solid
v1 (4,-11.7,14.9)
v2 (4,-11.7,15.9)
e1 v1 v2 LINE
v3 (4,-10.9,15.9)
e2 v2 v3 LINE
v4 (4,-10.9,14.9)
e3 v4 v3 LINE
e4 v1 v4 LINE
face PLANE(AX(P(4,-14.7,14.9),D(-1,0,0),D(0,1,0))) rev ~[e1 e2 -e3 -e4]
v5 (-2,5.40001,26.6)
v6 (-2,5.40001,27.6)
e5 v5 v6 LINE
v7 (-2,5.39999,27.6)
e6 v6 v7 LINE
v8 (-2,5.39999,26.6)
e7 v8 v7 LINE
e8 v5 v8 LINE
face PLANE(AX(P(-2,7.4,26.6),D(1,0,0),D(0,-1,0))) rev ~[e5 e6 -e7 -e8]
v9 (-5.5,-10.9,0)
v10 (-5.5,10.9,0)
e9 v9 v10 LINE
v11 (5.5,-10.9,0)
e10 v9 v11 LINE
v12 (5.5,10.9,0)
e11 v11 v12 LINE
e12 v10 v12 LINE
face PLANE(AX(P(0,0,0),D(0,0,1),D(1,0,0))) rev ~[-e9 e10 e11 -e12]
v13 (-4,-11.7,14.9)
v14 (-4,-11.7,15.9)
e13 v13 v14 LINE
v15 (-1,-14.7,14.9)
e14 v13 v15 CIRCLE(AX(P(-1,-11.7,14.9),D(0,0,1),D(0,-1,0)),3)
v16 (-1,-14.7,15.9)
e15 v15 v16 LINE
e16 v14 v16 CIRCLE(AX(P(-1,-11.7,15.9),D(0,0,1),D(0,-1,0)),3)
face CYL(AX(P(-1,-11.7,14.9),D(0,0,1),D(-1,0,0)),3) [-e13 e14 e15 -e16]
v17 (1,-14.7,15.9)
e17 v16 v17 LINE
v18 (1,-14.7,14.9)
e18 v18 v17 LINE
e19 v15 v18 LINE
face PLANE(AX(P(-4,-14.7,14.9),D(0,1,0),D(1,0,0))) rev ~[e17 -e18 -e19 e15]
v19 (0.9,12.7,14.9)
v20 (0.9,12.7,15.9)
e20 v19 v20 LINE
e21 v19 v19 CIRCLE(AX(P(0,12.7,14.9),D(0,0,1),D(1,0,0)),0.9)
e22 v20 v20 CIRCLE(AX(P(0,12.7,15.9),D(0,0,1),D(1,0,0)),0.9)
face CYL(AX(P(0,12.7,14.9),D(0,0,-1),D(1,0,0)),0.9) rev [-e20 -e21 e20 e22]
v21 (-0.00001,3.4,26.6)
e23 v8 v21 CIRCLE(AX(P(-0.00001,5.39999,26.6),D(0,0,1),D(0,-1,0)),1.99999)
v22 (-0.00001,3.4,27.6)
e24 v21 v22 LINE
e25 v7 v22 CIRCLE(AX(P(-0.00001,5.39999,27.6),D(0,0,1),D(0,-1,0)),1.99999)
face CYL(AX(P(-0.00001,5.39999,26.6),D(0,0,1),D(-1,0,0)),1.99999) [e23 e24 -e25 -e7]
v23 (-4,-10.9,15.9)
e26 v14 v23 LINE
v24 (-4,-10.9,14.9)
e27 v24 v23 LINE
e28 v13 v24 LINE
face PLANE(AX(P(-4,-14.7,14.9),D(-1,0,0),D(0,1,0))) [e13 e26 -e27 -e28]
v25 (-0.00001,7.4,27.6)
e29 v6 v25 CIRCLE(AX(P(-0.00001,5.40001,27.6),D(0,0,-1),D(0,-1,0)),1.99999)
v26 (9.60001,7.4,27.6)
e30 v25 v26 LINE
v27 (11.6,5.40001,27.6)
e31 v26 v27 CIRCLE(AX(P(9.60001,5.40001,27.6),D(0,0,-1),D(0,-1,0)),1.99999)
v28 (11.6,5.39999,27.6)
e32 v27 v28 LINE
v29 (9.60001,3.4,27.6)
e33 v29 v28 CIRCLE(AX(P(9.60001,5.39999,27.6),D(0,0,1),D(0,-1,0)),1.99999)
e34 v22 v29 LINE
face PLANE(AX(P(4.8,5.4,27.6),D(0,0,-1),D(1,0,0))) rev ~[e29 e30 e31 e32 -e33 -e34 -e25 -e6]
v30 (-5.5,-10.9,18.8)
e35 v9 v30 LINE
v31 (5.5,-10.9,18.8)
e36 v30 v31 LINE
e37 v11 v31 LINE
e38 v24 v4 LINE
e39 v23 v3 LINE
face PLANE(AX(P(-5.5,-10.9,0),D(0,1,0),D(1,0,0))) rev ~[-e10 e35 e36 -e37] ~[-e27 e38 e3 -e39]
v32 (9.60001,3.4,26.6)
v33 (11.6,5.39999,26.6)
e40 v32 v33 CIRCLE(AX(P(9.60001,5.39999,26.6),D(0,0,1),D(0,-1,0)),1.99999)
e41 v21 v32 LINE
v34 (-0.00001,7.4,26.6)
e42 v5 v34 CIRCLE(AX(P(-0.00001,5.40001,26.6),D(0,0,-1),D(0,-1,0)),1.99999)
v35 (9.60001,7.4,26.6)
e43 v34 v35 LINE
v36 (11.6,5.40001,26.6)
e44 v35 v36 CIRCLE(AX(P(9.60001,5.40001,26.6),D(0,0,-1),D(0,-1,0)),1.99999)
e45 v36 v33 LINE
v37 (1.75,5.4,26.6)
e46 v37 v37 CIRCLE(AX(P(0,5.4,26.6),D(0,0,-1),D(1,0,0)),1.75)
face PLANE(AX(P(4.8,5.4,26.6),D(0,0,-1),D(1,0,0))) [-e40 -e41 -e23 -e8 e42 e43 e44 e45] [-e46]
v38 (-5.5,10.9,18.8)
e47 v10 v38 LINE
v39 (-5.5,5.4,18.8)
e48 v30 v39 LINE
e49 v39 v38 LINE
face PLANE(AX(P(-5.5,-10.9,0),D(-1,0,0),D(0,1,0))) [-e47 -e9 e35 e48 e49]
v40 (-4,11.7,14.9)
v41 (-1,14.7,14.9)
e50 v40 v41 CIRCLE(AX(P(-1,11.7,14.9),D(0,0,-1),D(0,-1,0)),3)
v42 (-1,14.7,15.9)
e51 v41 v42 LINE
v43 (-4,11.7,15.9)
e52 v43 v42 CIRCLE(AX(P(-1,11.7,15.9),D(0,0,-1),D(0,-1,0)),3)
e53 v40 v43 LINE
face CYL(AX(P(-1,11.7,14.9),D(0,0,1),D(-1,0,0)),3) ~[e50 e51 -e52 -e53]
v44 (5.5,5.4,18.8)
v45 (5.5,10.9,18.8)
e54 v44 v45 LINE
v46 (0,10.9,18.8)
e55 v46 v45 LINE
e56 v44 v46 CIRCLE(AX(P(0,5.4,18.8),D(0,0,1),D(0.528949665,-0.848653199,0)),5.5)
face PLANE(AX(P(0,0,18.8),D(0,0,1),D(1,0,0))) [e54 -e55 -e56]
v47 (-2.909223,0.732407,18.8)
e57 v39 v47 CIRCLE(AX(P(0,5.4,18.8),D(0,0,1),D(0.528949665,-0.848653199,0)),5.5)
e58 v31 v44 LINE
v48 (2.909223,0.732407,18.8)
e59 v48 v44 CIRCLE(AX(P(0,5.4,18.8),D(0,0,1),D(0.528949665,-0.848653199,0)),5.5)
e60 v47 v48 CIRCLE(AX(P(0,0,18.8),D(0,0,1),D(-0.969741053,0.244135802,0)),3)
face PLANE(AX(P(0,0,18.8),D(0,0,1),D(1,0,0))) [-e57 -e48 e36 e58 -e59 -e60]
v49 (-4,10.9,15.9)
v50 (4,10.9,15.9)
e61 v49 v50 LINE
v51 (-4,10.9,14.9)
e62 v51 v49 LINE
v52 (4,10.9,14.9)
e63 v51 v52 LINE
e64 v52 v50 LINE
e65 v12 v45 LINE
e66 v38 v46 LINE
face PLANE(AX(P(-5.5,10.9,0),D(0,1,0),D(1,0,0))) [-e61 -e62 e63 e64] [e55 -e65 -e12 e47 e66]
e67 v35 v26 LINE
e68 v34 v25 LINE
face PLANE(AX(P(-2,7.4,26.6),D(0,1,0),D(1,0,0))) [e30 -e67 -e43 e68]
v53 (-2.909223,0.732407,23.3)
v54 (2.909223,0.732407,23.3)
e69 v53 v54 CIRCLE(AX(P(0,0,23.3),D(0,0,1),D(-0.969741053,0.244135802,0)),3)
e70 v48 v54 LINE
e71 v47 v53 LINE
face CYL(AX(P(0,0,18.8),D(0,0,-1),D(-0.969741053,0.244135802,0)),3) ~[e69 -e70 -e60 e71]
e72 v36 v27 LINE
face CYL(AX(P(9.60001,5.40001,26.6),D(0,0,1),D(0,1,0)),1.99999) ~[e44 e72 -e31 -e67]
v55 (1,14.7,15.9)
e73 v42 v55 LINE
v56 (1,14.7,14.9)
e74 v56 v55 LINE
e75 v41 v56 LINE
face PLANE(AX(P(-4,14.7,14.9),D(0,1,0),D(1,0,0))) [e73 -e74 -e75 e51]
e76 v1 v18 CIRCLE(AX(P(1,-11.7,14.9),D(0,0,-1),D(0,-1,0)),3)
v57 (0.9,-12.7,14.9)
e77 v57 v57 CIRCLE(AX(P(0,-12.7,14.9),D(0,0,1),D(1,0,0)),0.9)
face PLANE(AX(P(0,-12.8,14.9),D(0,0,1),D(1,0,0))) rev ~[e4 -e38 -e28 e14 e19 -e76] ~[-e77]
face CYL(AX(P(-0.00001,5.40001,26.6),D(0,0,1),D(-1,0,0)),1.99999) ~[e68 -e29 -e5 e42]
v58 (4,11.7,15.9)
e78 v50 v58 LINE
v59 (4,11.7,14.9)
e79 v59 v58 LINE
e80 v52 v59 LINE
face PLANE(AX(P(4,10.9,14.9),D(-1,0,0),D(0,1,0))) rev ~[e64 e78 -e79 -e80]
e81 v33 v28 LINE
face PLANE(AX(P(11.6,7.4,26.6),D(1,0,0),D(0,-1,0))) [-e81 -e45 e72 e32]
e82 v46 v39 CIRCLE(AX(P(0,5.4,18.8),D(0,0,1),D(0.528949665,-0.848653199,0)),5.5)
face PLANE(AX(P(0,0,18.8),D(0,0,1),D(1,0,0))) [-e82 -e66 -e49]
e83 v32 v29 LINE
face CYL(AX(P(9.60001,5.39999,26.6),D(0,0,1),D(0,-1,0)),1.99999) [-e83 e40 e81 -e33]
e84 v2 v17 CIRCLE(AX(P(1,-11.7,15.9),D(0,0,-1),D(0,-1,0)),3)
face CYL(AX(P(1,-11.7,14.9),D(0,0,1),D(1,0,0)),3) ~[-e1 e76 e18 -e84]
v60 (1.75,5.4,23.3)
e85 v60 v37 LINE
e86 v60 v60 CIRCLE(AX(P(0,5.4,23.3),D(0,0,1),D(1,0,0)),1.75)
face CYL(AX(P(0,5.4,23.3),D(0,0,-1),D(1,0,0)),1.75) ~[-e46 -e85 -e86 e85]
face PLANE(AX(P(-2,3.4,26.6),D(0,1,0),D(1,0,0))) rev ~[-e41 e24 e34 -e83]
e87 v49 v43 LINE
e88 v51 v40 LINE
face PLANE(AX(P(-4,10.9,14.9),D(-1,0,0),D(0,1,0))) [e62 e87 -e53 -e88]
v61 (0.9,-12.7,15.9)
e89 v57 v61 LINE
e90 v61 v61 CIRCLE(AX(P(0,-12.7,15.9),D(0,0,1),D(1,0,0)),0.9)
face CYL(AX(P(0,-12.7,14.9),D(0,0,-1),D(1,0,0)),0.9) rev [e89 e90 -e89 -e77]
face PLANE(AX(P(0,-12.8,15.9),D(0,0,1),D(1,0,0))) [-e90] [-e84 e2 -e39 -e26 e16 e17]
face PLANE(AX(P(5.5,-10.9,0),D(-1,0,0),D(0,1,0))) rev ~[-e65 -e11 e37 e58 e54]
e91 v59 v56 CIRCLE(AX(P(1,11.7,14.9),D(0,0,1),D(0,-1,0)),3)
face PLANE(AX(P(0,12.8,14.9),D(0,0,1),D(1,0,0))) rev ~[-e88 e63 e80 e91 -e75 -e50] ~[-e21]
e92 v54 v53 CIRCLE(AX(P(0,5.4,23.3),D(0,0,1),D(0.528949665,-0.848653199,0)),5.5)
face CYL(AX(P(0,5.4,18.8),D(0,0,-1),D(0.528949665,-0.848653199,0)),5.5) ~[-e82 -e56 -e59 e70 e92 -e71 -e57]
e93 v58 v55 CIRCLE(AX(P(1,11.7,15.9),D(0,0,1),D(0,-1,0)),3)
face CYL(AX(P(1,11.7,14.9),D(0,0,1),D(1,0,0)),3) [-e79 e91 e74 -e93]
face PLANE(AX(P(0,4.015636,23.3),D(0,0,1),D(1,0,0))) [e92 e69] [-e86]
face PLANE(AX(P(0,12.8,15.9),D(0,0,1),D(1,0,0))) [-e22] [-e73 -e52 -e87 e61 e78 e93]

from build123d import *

# Parameters (mm, degrees)
F0_W      = 11
F0_H      = 21.8
F1_DEPTH  = 18.8
F3_W      = 8
F3_H      = 3.8
F3_R      = 0.9
F4_DEPTH  = 1
F6_DEPTH  = 4.5
F7_R      = 1.75
F8_DEPTH  = 3.5
F10_W     = 13.6
F10_H     = 4
F11_DEPTH = 1
F12_R     = 1.99999
F13_R     = 3


# Not quite as in the source:
# - a fillet or chamfer is up to 0.001 mm smaller than in the source, because OpenCascade refuses the exact size


with BuildPart() as f1:
    # F0 (on Top) → F1 (new body)
    with BuildSketch(Plane.XY):
        Rectangle(F0_W, F0_H)
    extrude(amount=F1_DEPTH)

    # F3 (on offset) → F4 (join)
    with BuildSketch(Plane.XY.offset(14.9)):
        with Locations((0, 12.8)):
            Rectangle(F3_W, F3_H)
        with Locations((0, 12.7)):
            Circle(F3_R, mode=Mode.SUBTRACT)
        with Locations((0, -12.8)):
            Rectangle(F3_W, F3_H)
        with Locations((0, -12.7)):
            Circle(F3_R, mode=Mode.SUBTRACT)
    extrude(amount=F4_DEPTH)

    # F5 (on face) → F6 (join)
    with BuildSketch(Plane.XY.offset(18.8)):
        with BuildLine():
            ThreePointArc((-2.9092231591, 0.7324074074), (0, -3), (2.9092231591, 0.7324074074))
            ThreePointArc((2.9092231591, 0.7324074074), (0, 10.9), (-2.9092231591, 0.7324074074))
        make_face()
    extrude(amount=F6_DEPTH)

    # F7 (on face) → F8 (join)
    with BuildSketch(Plane.XY.offset(23.3)):
        with Locations((0, 5.4)):
            Circle(F7_R)
    extrude(amount=F8_DEPTH)

    # F10 (on offset) → F11 (join)
    with BuildSketch(Plane(origin=(0, 0, 26.6), x_dir=(1, 0, 0), z_dir=(0, 0, -1))):
        with Locations((4.8, -5.4)):
            Rectangle(F10_W, F10_H)
    extrude(amount=-F11_DEPTH)

    # F12 (radius 2 in the source; OpenCascade refuses exactly that, so slightly less here)
    f12_edges = [f1.edges().sort_by_distance(p)[0] for p in [
        (11.6, 3.4, 27.1),
        (11.6, 7.4, 27.1),
        (-2, 7.4, 27.1),
        (-2, 3.4, 27.1),
    ]]
    fillet(f12_edges, radius=F12_R)

    # F13
    f13_edges = [f1.edges().sort_by_distance(p)[0] for p in [
        (-4, -14.7, 15.4),
        (4, -14.7, 15.4),
        (4, 14.7, 15.4),
        (-4, 14.7, 15.4),
    ]]
    fillet(f13_edges, radius=F13_R)


solid = f1.part
